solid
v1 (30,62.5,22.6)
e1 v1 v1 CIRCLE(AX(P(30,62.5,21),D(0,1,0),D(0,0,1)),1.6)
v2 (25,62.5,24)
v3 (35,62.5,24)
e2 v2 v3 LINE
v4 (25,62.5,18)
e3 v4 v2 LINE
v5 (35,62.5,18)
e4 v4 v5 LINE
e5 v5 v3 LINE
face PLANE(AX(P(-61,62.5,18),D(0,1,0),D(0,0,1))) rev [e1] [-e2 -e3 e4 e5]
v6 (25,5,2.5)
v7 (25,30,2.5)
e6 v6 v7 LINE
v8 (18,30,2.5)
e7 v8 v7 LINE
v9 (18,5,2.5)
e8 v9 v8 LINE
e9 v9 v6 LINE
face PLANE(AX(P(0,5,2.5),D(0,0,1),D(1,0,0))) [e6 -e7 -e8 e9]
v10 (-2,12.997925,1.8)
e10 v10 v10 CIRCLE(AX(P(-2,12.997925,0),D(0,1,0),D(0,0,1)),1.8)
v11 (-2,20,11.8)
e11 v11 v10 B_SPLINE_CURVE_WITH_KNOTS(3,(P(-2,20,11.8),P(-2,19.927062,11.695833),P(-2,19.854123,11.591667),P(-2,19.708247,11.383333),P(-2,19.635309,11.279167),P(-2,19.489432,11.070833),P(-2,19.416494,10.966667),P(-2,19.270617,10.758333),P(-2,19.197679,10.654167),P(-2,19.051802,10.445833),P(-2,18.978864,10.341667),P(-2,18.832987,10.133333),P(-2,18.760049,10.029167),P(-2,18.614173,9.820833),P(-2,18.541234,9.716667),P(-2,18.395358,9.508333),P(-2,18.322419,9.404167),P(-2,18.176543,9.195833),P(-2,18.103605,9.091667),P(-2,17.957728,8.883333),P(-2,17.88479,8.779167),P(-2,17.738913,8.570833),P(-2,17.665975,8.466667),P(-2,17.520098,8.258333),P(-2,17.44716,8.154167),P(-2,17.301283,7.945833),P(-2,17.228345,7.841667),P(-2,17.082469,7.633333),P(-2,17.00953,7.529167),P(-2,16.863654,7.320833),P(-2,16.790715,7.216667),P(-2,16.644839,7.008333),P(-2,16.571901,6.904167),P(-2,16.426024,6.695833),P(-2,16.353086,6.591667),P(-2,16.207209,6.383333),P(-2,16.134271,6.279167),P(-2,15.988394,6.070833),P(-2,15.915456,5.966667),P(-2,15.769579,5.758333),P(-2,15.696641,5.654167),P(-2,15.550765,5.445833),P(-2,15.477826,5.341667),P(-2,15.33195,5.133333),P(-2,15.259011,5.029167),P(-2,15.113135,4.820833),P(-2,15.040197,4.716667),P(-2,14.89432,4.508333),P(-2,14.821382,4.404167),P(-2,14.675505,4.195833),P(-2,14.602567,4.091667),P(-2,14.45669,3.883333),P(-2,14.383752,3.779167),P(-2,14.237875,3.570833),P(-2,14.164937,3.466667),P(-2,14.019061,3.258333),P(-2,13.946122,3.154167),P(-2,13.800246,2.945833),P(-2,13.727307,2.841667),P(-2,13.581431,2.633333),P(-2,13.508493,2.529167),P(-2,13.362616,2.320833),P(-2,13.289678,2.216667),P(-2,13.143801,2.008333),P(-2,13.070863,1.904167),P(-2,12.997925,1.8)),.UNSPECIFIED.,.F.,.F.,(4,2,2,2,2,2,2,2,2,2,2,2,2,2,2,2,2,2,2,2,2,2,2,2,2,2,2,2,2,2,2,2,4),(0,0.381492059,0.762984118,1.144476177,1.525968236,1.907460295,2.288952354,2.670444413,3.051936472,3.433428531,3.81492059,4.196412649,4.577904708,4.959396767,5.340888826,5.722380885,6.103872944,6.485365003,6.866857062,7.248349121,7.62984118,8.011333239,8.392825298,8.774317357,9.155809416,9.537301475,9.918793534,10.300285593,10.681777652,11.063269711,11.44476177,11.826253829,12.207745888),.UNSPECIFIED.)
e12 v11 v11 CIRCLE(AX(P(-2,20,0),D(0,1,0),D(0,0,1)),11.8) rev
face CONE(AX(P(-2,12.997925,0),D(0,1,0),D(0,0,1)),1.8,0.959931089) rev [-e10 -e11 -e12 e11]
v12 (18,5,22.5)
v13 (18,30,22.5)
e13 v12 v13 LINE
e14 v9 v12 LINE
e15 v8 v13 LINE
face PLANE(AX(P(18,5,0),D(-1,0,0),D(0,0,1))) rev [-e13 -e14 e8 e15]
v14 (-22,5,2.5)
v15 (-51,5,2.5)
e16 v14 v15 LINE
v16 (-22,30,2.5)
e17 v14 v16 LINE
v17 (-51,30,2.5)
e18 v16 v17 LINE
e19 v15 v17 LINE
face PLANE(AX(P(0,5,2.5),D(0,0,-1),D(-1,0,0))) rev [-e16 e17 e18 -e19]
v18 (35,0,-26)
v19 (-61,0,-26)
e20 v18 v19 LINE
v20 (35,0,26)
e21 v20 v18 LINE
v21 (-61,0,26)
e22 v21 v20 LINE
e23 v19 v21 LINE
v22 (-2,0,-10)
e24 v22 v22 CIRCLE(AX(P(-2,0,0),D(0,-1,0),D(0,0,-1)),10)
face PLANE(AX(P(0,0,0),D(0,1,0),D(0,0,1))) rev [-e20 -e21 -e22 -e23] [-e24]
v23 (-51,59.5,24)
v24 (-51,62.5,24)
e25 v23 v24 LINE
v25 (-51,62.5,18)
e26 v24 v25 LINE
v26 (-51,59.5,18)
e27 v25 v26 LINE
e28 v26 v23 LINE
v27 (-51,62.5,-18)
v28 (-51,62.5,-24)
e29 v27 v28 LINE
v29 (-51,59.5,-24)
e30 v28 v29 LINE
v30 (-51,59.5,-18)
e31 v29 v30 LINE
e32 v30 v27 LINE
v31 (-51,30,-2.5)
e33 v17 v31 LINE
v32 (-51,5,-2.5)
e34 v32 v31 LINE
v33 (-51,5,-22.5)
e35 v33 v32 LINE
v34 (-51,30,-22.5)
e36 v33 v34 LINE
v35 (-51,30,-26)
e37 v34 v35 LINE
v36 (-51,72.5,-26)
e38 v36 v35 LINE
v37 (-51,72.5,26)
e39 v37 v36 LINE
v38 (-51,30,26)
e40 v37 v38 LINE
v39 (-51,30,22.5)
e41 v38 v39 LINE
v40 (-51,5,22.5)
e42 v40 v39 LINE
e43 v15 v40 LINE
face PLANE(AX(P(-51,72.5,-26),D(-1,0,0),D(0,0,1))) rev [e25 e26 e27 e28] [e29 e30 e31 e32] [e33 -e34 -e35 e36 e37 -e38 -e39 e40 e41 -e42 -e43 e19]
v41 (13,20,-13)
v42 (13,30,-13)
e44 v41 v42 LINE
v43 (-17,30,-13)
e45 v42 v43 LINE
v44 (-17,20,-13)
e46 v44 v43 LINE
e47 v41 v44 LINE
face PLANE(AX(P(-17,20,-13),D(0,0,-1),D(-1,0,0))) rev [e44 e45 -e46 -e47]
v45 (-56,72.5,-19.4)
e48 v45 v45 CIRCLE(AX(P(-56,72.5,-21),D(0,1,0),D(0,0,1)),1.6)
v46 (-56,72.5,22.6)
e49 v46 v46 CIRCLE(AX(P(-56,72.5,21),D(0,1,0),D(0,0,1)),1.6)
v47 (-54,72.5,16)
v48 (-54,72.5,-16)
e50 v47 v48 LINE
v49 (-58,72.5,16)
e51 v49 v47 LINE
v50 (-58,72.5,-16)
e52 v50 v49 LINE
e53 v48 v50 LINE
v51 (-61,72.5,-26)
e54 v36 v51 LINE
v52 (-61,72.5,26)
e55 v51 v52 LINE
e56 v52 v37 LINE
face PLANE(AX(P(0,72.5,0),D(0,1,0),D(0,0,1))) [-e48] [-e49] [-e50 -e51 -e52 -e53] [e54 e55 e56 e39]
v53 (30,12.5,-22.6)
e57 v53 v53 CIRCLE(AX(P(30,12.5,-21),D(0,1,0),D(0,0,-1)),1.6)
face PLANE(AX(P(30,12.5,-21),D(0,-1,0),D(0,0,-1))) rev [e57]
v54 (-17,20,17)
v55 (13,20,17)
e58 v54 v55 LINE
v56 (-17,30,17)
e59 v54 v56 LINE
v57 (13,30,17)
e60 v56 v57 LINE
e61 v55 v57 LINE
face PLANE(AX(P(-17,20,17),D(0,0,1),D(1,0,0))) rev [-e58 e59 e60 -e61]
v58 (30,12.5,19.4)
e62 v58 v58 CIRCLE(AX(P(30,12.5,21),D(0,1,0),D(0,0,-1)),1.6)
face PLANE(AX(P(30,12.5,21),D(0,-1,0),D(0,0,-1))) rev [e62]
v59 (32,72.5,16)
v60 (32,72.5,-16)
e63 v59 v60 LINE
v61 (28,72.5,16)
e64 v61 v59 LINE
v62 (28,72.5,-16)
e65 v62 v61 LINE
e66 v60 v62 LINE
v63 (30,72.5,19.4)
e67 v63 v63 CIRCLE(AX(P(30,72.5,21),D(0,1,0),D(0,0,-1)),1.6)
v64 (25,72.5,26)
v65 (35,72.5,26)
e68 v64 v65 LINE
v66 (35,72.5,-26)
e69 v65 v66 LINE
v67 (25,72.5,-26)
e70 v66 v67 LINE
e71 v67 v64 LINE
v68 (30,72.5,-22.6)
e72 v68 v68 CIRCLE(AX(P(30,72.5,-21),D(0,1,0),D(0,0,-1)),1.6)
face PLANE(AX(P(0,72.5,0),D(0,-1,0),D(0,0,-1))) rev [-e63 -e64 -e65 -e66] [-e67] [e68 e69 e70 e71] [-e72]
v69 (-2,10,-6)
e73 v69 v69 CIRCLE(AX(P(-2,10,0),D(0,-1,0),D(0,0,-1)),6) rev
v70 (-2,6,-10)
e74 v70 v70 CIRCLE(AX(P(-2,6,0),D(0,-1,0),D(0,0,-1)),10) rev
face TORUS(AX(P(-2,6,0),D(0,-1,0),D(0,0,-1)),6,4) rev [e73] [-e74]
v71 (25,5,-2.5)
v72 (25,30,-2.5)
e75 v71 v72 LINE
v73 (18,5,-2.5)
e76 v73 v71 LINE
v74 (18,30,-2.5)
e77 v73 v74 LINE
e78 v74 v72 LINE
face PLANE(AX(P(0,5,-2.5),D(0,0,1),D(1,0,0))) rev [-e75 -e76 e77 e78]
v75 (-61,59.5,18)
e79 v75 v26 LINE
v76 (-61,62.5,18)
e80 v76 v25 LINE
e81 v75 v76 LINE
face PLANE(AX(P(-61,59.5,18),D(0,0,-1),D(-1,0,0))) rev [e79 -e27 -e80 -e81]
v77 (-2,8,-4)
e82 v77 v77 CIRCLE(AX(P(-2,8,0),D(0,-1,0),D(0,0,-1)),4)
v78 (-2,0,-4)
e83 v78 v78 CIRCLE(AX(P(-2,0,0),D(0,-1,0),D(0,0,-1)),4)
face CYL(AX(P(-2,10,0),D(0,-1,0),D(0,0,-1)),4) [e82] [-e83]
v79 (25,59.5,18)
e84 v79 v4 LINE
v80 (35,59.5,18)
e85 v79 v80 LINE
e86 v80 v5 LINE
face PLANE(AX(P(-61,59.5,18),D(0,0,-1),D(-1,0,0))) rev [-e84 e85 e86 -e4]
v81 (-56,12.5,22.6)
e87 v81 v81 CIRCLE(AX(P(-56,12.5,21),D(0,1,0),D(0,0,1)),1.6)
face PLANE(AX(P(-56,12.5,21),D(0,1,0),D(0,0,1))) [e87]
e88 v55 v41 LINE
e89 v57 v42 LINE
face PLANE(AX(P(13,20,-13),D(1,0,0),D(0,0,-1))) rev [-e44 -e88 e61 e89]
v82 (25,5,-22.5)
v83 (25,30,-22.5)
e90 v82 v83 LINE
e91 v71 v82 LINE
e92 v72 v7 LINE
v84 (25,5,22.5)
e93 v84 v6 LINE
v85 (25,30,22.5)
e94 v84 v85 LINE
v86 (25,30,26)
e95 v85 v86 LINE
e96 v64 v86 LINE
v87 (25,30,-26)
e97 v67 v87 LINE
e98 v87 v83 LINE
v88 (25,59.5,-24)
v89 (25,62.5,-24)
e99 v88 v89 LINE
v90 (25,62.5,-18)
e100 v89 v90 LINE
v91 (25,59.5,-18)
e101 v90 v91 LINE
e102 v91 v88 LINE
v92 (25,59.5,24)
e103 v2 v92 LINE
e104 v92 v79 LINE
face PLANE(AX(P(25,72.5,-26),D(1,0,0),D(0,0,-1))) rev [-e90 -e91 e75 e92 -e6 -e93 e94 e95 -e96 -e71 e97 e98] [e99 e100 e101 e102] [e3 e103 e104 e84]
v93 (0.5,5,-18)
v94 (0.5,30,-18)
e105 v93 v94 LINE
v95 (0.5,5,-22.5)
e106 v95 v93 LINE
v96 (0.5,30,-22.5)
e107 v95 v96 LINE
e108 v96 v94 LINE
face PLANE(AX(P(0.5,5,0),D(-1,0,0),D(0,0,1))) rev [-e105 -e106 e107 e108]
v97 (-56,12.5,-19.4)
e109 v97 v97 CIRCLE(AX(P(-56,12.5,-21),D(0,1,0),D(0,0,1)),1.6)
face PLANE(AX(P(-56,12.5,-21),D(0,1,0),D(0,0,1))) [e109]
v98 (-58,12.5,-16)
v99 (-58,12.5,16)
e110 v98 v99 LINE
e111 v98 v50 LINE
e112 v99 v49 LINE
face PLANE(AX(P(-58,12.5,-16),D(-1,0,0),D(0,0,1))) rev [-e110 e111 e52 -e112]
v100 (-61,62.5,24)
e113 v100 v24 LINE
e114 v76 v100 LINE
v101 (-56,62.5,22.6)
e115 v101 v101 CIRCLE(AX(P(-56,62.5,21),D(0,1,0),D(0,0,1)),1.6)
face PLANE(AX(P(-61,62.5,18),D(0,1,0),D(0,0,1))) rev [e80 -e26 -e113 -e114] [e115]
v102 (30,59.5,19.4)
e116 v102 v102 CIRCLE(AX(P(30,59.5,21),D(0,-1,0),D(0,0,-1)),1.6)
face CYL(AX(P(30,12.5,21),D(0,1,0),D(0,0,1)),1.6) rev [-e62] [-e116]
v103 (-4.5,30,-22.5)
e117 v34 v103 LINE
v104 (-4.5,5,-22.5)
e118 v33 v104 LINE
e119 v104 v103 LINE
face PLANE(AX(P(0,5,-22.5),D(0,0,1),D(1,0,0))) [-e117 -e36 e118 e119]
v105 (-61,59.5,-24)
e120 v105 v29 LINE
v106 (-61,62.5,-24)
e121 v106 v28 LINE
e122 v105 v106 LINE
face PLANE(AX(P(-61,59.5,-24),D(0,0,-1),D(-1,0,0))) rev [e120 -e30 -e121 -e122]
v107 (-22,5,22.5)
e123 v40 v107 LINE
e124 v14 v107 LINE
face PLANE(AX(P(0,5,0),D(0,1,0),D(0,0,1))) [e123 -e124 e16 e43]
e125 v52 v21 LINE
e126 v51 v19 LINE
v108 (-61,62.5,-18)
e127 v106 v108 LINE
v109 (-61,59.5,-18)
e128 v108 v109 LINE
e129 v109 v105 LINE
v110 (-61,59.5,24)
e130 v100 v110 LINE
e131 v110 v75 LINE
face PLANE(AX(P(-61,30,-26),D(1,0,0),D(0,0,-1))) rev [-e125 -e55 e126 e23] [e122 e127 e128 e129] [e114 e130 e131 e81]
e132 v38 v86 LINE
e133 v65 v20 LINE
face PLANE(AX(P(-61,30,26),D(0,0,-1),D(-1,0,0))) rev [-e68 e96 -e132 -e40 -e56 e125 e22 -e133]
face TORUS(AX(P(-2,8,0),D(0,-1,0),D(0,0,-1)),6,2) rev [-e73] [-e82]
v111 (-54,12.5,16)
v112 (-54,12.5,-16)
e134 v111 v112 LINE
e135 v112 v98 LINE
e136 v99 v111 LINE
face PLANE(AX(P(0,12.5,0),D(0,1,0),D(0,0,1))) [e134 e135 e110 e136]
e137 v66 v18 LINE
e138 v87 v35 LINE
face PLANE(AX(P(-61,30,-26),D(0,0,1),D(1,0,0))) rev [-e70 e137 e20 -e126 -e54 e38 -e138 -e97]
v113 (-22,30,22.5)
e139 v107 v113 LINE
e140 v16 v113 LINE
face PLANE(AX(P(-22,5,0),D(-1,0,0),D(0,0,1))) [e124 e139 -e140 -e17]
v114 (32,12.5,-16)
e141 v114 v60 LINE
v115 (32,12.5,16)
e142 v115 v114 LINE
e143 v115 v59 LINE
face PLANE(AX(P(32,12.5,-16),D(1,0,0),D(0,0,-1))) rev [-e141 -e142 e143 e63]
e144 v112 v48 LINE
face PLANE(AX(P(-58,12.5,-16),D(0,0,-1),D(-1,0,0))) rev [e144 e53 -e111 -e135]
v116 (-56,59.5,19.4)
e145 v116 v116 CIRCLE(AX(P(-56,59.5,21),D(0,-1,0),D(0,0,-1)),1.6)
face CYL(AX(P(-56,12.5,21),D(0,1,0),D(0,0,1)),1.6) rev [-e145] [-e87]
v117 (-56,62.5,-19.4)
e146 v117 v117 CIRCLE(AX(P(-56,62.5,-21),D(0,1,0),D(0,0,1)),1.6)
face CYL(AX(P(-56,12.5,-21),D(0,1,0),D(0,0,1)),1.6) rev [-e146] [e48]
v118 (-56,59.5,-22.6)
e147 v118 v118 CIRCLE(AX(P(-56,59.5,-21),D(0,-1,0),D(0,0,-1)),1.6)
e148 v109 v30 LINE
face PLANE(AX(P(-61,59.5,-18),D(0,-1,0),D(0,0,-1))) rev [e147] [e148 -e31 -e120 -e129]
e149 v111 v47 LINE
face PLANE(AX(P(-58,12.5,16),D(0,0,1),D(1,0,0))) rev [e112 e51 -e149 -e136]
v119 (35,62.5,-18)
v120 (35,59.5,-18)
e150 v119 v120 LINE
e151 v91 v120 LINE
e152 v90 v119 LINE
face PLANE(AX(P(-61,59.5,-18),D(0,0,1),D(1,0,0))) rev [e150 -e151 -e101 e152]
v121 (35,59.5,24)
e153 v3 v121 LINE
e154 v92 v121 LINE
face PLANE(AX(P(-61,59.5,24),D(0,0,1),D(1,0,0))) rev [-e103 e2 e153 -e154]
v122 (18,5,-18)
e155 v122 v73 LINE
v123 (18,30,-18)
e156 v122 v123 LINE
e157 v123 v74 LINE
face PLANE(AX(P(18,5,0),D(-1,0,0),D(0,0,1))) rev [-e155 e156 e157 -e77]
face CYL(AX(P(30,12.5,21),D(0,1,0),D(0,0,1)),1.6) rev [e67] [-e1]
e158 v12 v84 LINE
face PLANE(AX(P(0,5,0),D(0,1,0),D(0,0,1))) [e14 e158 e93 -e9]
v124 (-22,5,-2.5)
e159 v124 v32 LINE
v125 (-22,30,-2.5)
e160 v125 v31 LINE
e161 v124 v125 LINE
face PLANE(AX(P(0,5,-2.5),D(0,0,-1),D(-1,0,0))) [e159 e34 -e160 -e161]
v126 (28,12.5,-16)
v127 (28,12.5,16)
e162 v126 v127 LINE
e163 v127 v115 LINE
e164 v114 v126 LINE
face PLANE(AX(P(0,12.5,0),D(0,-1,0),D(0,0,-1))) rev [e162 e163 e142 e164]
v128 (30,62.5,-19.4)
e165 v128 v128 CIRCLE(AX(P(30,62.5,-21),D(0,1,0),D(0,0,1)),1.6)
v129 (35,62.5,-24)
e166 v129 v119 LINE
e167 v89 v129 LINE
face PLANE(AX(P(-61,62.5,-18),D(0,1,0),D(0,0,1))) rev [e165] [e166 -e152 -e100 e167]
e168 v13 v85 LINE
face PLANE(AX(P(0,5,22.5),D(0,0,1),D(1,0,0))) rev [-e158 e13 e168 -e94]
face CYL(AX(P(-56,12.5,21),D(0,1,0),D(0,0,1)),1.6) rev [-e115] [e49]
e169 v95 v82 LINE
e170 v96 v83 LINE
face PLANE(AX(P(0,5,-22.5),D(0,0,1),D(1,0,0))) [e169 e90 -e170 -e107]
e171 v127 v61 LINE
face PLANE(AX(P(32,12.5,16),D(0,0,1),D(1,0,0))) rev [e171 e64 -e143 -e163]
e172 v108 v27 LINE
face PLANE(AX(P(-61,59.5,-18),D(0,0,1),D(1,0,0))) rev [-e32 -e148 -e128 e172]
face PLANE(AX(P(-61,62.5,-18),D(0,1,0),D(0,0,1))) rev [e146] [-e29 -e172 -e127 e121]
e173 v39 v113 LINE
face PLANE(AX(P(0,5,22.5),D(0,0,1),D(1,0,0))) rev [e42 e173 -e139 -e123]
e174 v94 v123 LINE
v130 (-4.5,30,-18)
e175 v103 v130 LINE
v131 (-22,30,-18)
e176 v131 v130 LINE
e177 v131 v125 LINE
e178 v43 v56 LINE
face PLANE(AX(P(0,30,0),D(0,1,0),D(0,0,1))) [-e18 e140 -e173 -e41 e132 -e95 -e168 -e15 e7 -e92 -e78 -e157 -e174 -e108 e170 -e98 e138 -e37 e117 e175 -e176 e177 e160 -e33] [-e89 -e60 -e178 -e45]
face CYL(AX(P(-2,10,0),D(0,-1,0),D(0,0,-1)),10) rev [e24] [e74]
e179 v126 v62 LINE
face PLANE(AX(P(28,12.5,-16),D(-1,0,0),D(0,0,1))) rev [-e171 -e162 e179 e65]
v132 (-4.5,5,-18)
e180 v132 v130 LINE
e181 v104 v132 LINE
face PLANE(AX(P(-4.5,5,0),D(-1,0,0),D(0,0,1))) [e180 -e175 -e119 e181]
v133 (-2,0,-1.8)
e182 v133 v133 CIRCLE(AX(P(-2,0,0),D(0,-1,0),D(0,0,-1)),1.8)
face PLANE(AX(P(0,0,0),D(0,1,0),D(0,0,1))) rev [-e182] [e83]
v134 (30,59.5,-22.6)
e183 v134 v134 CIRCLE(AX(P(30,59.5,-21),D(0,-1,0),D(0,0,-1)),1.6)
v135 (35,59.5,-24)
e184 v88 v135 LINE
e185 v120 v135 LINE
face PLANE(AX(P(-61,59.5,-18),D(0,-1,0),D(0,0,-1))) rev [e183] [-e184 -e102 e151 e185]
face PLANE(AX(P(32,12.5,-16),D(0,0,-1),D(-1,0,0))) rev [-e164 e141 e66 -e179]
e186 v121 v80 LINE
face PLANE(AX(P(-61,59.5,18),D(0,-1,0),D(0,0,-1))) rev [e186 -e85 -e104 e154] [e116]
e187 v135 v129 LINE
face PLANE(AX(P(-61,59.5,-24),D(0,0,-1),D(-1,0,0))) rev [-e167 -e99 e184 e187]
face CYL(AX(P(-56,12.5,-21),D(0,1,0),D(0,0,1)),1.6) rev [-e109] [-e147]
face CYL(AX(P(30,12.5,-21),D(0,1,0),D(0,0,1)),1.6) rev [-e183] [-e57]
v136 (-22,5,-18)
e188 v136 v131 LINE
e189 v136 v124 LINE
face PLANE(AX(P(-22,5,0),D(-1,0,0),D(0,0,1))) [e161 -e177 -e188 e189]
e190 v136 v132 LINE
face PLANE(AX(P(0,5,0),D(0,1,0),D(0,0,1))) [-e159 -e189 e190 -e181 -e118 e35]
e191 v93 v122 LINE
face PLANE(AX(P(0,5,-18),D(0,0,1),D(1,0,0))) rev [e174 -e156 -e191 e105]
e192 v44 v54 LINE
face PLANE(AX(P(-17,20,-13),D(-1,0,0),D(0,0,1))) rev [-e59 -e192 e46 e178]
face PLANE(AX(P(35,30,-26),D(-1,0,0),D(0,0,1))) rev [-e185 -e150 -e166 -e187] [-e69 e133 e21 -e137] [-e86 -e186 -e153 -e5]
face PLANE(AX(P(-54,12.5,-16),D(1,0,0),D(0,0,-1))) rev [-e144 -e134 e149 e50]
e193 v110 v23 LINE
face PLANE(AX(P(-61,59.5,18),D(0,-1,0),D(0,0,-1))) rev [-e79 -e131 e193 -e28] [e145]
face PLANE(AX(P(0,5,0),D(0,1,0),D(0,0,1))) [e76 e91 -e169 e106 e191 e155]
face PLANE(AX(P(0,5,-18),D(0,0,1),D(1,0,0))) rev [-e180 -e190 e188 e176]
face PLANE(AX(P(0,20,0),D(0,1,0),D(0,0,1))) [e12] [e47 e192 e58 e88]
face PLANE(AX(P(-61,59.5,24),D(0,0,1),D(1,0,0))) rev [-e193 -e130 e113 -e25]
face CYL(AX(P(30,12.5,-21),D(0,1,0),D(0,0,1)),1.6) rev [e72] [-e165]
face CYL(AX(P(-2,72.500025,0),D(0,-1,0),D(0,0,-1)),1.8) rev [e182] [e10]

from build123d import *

# Parameters (mm, degrees)
SKETCH1_W           = 96
SKETCH1_H           = 52
BOSS_EXTRUDE1_DEPTH = 30
SKETCH3_W           = 30
SKETCH3_H           = 30
CUT_EXTRUDE1_DEPTH  = 10
SKETCH4_W           = 10
SKETCH4_H           = 52
BOSS_EXTRUDE2_DEPTH = 42.5
CUT_EXTRUDE2_DEPTH  = 25
SKETCH6_R           = 1.8
CUT_EXTRUDE3_DEPTH  = 99.250954194
SKETCH7_R           = 10
SKETCH7_R_2         = 4
CUT_EXTRUDE4_DEPTH  = 10
FILLET2_R           = 2
FILLET3_R           = 4
CHAMFER1_SIZE       = 10
CHAMFER1_SIZE2      = 7.002075382
SKETCH10_W          = 6
SKETCH10_H          = 3
CUT_EXTRUDE7_DEPTH  = 124.078227157
SKETCH11_R          = 1.6
SKETCH11_W          = 4
SKETCH11_H          = 32
CUT_EXTRUDE8_DEPTH  = 60


with BuildPart() as part:
    # Sketch1 → Boss-Extrude1 (new body)
    with BuildSketch(Plane(origin=(0, 0, 0), x_dir=(1, 0, 0), z_dir=(0, 1, 0))):
        with Locations((-13, 0)):
            Rectangle(SKETCH1_W, SKETCH1_H)
    extrude(amount=BOSS_EXTRUDE1_DEPTH)

    # Sketch3 → Cut-Extrude1 (cut)
    with BuildSketch(Plane(origin=(0, 30, 0), x_dir=(1, 0, 0), z_dir=(0, 1, 0))):
        with Locations((-2, -2)):
            Rectangle(SKETCH3_W, SKETCH3_H)
    extrude(amount=-CUT_EXTRUDE1_DEPTH, mode=Mode.SUBTRACT)

    # Sketch4 → Boss-Extrude2 (add)
    with BuildSketch(Plane(origin=(0, 30, 0), x_dir=(1, 0, 0), z_dir=(0, 1, 0))):
        with Locations((30, 0)):
            Rectangle(SKETCH4_W, SKETCH4_H)
        with Locations((-56, 0)):
            Rectangle(SKETCH4_W, SKETCH4_H)
    extrude(amount=BOSS_EXTRUDE2_DEPTH)

    # Sketch5 → Cut-Extrude2 (cut)
    with BuildSketch(Plane(origin=(0, 30, 0), x_dir=(1, 0, 0), z_dir=(0, 1, 0))):
        Polygon((25, 22.5), (0.5, 22.5), (0.5, 18), (18, 18), (18, 2.5), (25, 2.5), align=None)
        Polygon((-4.5, 22.5), (-51, 22.5), (-51, 2.5), (-22, 2.5), (-22, 18), (-4.5, 18), align=None)
        Polygon((-22, -2.5), (-51, -2.5), (-51, -22.5), (-22, -22.5), (-22, -20), align=None)
        Polygon((25, -22.5), (25, -2.5), (18, -2.5), (18, -20), (18, -22.5), align=None)
    extrude(amount=-CUT_EXTRUDE2_DEPTH, mode=Mode.SUBTRACT)

    # Sketch6 → Cut-Extrude3 (cut, through all)
    with BuildSketch(Plane.XZ):
        with Locations(Location((-2, 0, 0), (0, 0, 270))):
            Circle(SKETCH6_R)
    extrude(amount=-CUT_EXTRUDE3_DEPTH, mode=Mode.SUBTRACT)

    # Sketch7 → Cut-Extrude4 (cut)
    with BuildSketch(Plane.XZ):
        with Locations(Location((-2, 0, 0), (0, 0, 270))):
            Circle(SKETCH7_R)
        with Locations(Location((-2, 0, 0), (0, 0, 270))):
            Circle(SKETCH7_R_2, mode=Mode.SUBTRACT)
    extrude(amount=-CUT_EXTRUDE4_DEPTH, mode=Mode.SUBTRACT)

    # Fillet2
    fillet2_edges = [part.edges().sort_by_distance(p)[0] for p in [
        (-2, 10, 4),
    ]]
    fillet(fillet2_edges, radius=FILLET2_R)

    # Fillet3
    fillet3_edges = [part.edges().sort_by_distance(p)[0] for p in [
        (-2, 10, 10),
    ]]
    fillet(fillet3_edges, radius=FILLET3_R - 0.0001)  # a hair under: the kernel refuses the full size

    # Chamfer1
    chamfer1_edges = [part.edges().sort_by_distance(p)[0] for p in [
        (-2, 20, 1.8),
    ]]
    chamfer1_side = [part.faces().sort_by_distance(p)[0] for p in [
        (-2, 20, 2.022878214),
    ]]
    chamfer(chamfer1_edges, length=CHAMFER1_SIZE, length2=CHAMFER1_SIZE2, reference=chamfer1_side[0])

    # Sketch10 → Cut-Extrude7 (cut, through all)
    with BuildSketch(Plane(origin=(35, 0, 0), x_dir=(0, 0, -1), z_dir=(1, 0, 0))):
        with Locations((21, 61)):
            Rectangle(SKETCH10_W, SKETCH10_H)
        with Locations((-21, 61)):
            Rectangle(SKETCH10_W, SKETCH10_H)
    extrude(amount=-CUT_EXTRUDE7_DEPTH, mode=Mode.SUBTRACT)

    # Sketch11 → Cut-Extrude8 (cut)
    with BuildSketch(Plane(origin=(0, 72.5, 0), x_dir=(1, 0, 0), z_dir=(0, 1, 0))):
        with Locations(Location((-56, 21, 0), (0, 0, 270))):
            Circle(SKETCH11_R)
        with Locations(Location((-56, -21, 0), (0, 0, 270))):
            Circle(SKETCH11_R)
        with Locations(Location((30, -21, 0), (0, 0, 270))):
            Circle(SKETCH11_R)
        with Locations(Location((30, 21, 0), (0, 0, 270))):
            Circle(SKETCH11_R)
        with Locations((-56, 0)):
            Rectangle(SKETCH11_W, SKETCH11_H)
        with Locations((30, 0)):
            Rectangle(SKETCH11_W, SKETCH11_H)
    extrude(amount=-CUT_EXTRUDE8_DEPTH, mode=Mode.SUBTRACT)


solid = part.part
